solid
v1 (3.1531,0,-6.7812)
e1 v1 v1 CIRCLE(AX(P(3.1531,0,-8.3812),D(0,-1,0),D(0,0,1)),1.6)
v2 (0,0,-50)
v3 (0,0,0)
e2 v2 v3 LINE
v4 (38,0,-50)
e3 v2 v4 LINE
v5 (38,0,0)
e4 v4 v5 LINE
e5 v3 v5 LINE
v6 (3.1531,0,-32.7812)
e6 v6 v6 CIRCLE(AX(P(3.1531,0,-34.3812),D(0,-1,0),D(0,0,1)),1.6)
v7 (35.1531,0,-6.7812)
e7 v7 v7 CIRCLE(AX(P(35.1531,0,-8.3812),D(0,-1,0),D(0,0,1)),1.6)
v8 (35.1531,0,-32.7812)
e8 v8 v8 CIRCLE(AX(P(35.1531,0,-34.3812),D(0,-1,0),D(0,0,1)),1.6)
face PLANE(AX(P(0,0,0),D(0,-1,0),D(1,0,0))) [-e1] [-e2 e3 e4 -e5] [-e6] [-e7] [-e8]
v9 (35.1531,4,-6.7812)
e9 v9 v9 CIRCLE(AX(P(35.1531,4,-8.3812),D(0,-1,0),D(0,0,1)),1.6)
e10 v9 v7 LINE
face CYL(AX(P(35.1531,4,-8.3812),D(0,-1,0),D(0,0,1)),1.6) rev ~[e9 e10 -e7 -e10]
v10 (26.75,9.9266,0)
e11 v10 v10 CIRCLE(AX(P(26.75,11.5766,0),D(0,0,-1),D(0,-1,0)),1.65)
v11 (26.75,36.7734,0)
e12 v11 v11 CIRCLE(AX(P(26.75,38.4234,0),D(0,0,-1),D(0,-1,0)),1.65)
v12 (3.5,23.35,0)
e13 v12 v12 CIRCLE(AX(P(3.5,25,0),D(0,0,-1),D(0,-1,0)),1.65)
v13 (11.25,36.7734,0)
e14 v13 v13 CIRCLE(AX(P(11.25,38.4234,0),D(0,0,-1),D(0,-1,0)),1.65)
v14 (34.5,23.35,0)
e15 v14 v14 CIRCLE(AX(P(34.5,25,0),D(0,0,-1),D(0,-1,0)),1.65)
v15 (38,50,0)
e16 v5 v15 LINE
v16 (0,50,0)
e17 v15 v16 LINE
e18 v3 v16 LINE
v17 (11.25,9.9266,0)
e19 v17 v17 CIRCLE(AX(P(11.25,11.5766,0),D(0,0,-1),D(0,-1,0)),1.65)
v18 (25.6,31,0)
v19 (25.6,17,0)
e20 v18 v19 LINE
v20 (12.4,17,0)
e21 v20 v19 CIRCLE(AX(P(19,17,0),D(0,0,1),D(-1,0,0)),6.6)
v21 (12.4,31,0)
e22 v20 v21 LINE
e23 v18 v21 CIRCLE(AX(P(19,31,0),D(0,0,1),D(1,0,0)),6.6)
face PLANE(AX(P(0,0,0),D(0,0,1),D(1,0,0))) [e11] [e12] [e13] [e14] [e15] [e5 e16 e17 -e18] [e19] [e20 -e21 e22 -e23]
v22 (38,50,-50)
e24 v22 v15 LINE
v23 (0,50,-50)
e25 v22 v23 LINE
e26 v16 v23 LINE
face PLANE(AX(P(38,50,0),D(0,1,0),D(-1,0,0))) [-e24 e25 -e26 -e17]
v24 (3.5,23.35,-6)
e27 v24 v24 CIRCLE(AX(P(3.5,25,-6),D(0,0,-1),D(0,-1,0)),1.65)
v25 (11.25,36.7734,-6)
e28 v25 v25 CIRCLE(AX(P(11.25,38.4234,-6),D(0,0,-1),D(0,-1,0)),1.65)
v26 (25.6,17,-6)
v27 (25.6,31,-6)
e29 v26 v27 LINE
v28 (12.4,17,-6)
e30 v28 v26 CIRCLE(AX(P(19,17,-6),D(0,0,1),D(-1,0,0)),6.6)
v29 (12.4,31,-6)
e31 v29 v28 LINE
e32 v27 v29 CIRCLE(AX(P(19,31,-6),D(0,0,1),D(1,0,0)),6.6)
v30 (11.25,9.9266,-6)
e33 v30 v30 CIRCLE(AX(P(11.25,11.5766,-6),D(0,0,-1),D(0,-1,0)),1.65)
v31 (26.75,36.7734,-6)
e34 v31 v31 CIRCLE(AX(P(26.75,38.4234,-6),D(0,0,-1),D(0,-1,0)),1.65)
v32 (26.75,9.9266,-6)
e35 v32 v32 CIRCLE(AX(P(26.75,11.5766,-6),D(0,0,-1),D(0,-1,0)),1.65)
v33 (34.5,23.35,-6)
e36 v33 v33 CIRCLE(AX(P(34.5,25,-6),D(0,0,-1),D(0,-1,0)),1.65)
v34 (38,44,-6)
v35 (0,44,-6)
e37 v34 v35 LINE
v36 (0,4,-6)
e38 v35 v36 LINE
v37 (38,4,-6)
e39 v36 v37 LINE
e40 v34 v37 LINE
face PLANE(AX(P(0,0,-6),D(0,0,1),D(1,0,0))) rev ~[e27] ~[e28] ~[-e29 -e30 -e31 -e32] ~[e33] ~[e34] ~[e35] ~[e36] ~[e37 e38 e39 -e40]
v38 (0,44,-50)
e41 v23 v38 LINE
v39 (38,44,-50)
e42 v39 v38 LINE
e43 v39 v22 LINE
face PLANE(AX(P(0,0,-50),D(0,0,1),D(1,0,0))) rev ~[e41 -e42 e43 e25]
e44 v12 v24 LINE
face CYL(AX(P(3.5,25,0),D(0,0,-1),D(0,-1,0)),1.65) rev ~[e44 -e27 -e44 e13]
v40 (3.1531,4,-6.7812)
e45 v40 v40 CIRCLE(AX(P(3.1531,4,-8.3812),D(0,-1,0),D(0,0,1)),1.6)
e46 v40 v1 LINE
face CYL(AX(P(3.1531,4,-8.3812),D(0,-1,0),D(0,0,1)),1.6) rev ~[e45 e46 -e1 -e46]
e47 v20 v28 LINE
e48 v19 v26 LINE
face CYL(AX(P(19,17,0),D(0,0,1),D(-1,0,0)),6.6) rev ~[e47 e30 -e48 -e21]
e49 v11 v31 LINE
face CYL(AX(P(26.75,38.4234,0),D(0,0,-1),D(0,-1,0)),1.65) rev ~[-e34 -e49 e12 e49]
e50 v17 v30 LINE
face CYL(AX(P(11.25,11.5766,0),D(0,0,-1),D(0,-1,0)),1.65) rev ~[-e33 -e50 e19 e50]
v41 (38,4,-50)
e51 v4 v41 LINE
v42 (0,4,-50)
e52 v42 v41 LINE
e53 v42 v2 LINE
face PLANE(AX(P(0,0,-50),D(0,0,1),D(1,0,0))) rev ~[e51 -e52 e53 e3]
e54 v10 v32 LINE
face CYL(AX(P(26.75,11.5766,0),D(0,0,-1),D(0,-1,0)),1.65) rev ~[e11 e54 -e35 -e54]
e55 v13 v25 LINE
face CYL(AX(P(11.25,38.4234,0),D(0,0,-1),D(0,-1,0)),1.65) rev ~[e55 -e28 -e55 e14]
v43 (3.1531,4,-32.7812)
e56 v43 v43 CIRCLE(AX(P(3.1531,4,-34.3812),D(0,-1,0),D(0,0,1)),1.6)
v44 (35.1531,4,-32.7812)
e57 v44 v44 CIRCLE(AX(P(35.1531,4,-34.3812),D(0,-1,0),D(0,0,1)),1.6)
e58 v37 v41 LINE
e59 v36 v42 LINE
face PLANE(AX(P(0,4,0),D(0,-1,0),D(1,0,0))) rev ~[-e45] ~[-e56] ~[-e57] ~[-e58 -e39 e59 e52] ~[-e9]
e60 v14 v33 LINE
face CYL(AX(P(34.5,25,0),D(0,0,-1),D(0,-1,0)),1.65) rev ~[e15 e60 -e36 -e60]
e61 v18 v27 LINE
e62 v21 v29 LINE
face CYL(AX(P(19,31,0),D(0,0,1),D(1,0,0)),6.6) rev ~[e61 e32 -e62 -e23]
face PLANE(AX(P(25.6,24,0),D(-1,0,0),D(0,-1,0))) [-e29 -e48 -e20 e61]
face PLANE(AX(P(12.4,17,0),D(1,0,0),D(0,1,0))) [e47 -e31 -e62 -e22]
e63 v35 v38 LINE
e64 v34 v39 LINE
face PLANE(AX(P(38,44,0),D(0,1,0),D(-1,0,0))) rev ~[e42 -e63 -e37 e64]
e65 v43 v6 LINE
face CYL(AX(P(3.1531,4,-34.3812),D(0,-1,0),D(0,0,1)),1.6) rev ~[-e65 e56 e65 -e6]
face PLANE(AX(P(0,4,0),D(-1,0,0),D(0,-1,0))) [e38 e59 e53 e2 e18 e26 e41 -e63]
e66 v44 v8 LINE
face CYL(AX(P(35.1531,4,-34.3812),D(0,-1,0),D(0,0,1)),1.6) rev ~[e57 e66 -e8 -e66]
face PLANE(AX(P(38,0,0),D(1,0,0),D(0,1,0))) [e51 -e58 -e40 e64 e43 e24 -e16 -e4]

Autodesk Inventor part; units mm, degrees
ref_plane "YZ Plane" through (0, 0, 0) normal (1, 0, 0) x (0, 1, 0)
ref_plane "XZ Plane" through (0, 0, 0) normal (0, 1, 0) x (-1, 0, 0)
ref_plane "XY Plane" through (0, 0, 0) normal (0, 0, 1) x (1, 0, 0)
sketch "スケッチ1" plane through (0, 0, 0) normal (0, 0, 1) x (1, 0, 0)
  line L0 (0, 0) -> (38, 0)
  line L1 (38, 0) -> (38, 24)
  line L2 (38, 24) -> (0, 24)
  line L3 (0, 24) -> (0, 0)
  line L4 (0, 4) -> (38, 4)
  line L5 (12.4, 31) -> (25.6, 31)
  line L6 (25.6, 31) -> (25.6, 17)
  line L7 (25.6, 17) -> (12.4, 17)
  line L8 (12.4, 17) -> (12.4, 31)
  arc A0 (25.6, 31) -> (12.4, 31) centre (19, 31) ccw
  arc A1 (12.4, 17) -> (25.6, 17) centre (19, 17) ccw
  line L9 (0, 24) -> (38, 24)
  line L10 (38, 24) -> (38, 44)
  line L11 (38, 44) -> (0, 44)
  line L12 (0, 44) -> (0, 24)
  line L13 (0, 44) -> (38, 44)
  line L14 (38, 44) -> (38, 50)
  line L15 (38, 50) -> (0, 50)
  line L16 (0, 50) -> (0, 44)
  point P0 (19, 24)
  point P1 (19, 39.6)
  point P2 (25.6, 24)
  point P3 (12.4, 24)
  dimension "d0" = 38
  dimension "d1" = 24
  dimension "d2" = 4
  dimension "d3" = 15.6
  dimension "d4" = 13.2
  dimension "d5" = 14
  dimension "d6" = 7
  dimension "d7" = 19
  dimension "d49" = 6
  dimension "d50" = 38
  dimension "d51" = 20
  dimension "d52" = 38
extrude "押し出し1" add sketch "スケッチ1" against normal blind 6 contours L3 L4 L1 L0 | L3 L2 L8 A1 L6 L1 L4 | L12 L11 L10 L2 L6 A0 L8 | L16 L15 L14 L11
extrude "押し出し2" add sketch "スケッチ1" against normal blind 50 contours L3 L4 L1 L0 | L16 L15 L14 L11
sketch "スケッチ2" plane through (0, 0, 0) normal (0, 0, 1) x (1, 0, 0)
  line L0 (0, 50) -> (0, 0) projected
  line L1 (38, 50) -> (0, 50) projected
  point P0 (3.5, 25)
  point P1 (19, 25)
  point P2 (11.25, 11.5766)
  point P3 (26.75, 11.5766)
  point P4 (34.5, 25)
  point P5 (26.75, 38.4234)
  point P6 (11.25, 38.4234)
  point P7 (0, 25)
  point P8 (19, 43.6)
  point P9 (0, 25)
  point P10 (19, 50)
  dimension "d16" = 360
  dimension "d18" = 15.5
hole "穴1" at (3.5, 25, 0) at (19, 25, 0) at (11.25, 11.5766, 0) at (26.75, 11.5766, 0) at (34.5, 25, 0) at (26.75, 38.4234, 0) at (11.25, 38.4234, 0) direction (0, 0, -1) diameter 3.3 depth 8.1 tip angle 118
sketch "スケッチ4" plane through (0, 4, -6) normal (0, 1, 0) x (1, 0, 0)
  point P0 (0, -6)
  point P1 (3.1531, 2.3812)
  point P2 (35.1531, 2.3812)
  point P3 (35.1531, 28.3812)
  point P4 (3.1531, 28.3812)
  dimension "d47" = 32
  dimension "d48" = 26
hole "穴3" at (3.1531, 4, -8.3812) at (35.1531, 4, -8.3812) at (35.1531, 4, -34.3812) at (3.1531, 4, -34.3812) direction (0, -1, 0) diameter 3.2 depth 8.1 tip angle 118
equation "\"d7\" = 0.5 * d0"
equation "\"d51\" = d1 - d2"
properties part number "ギアボックス"
